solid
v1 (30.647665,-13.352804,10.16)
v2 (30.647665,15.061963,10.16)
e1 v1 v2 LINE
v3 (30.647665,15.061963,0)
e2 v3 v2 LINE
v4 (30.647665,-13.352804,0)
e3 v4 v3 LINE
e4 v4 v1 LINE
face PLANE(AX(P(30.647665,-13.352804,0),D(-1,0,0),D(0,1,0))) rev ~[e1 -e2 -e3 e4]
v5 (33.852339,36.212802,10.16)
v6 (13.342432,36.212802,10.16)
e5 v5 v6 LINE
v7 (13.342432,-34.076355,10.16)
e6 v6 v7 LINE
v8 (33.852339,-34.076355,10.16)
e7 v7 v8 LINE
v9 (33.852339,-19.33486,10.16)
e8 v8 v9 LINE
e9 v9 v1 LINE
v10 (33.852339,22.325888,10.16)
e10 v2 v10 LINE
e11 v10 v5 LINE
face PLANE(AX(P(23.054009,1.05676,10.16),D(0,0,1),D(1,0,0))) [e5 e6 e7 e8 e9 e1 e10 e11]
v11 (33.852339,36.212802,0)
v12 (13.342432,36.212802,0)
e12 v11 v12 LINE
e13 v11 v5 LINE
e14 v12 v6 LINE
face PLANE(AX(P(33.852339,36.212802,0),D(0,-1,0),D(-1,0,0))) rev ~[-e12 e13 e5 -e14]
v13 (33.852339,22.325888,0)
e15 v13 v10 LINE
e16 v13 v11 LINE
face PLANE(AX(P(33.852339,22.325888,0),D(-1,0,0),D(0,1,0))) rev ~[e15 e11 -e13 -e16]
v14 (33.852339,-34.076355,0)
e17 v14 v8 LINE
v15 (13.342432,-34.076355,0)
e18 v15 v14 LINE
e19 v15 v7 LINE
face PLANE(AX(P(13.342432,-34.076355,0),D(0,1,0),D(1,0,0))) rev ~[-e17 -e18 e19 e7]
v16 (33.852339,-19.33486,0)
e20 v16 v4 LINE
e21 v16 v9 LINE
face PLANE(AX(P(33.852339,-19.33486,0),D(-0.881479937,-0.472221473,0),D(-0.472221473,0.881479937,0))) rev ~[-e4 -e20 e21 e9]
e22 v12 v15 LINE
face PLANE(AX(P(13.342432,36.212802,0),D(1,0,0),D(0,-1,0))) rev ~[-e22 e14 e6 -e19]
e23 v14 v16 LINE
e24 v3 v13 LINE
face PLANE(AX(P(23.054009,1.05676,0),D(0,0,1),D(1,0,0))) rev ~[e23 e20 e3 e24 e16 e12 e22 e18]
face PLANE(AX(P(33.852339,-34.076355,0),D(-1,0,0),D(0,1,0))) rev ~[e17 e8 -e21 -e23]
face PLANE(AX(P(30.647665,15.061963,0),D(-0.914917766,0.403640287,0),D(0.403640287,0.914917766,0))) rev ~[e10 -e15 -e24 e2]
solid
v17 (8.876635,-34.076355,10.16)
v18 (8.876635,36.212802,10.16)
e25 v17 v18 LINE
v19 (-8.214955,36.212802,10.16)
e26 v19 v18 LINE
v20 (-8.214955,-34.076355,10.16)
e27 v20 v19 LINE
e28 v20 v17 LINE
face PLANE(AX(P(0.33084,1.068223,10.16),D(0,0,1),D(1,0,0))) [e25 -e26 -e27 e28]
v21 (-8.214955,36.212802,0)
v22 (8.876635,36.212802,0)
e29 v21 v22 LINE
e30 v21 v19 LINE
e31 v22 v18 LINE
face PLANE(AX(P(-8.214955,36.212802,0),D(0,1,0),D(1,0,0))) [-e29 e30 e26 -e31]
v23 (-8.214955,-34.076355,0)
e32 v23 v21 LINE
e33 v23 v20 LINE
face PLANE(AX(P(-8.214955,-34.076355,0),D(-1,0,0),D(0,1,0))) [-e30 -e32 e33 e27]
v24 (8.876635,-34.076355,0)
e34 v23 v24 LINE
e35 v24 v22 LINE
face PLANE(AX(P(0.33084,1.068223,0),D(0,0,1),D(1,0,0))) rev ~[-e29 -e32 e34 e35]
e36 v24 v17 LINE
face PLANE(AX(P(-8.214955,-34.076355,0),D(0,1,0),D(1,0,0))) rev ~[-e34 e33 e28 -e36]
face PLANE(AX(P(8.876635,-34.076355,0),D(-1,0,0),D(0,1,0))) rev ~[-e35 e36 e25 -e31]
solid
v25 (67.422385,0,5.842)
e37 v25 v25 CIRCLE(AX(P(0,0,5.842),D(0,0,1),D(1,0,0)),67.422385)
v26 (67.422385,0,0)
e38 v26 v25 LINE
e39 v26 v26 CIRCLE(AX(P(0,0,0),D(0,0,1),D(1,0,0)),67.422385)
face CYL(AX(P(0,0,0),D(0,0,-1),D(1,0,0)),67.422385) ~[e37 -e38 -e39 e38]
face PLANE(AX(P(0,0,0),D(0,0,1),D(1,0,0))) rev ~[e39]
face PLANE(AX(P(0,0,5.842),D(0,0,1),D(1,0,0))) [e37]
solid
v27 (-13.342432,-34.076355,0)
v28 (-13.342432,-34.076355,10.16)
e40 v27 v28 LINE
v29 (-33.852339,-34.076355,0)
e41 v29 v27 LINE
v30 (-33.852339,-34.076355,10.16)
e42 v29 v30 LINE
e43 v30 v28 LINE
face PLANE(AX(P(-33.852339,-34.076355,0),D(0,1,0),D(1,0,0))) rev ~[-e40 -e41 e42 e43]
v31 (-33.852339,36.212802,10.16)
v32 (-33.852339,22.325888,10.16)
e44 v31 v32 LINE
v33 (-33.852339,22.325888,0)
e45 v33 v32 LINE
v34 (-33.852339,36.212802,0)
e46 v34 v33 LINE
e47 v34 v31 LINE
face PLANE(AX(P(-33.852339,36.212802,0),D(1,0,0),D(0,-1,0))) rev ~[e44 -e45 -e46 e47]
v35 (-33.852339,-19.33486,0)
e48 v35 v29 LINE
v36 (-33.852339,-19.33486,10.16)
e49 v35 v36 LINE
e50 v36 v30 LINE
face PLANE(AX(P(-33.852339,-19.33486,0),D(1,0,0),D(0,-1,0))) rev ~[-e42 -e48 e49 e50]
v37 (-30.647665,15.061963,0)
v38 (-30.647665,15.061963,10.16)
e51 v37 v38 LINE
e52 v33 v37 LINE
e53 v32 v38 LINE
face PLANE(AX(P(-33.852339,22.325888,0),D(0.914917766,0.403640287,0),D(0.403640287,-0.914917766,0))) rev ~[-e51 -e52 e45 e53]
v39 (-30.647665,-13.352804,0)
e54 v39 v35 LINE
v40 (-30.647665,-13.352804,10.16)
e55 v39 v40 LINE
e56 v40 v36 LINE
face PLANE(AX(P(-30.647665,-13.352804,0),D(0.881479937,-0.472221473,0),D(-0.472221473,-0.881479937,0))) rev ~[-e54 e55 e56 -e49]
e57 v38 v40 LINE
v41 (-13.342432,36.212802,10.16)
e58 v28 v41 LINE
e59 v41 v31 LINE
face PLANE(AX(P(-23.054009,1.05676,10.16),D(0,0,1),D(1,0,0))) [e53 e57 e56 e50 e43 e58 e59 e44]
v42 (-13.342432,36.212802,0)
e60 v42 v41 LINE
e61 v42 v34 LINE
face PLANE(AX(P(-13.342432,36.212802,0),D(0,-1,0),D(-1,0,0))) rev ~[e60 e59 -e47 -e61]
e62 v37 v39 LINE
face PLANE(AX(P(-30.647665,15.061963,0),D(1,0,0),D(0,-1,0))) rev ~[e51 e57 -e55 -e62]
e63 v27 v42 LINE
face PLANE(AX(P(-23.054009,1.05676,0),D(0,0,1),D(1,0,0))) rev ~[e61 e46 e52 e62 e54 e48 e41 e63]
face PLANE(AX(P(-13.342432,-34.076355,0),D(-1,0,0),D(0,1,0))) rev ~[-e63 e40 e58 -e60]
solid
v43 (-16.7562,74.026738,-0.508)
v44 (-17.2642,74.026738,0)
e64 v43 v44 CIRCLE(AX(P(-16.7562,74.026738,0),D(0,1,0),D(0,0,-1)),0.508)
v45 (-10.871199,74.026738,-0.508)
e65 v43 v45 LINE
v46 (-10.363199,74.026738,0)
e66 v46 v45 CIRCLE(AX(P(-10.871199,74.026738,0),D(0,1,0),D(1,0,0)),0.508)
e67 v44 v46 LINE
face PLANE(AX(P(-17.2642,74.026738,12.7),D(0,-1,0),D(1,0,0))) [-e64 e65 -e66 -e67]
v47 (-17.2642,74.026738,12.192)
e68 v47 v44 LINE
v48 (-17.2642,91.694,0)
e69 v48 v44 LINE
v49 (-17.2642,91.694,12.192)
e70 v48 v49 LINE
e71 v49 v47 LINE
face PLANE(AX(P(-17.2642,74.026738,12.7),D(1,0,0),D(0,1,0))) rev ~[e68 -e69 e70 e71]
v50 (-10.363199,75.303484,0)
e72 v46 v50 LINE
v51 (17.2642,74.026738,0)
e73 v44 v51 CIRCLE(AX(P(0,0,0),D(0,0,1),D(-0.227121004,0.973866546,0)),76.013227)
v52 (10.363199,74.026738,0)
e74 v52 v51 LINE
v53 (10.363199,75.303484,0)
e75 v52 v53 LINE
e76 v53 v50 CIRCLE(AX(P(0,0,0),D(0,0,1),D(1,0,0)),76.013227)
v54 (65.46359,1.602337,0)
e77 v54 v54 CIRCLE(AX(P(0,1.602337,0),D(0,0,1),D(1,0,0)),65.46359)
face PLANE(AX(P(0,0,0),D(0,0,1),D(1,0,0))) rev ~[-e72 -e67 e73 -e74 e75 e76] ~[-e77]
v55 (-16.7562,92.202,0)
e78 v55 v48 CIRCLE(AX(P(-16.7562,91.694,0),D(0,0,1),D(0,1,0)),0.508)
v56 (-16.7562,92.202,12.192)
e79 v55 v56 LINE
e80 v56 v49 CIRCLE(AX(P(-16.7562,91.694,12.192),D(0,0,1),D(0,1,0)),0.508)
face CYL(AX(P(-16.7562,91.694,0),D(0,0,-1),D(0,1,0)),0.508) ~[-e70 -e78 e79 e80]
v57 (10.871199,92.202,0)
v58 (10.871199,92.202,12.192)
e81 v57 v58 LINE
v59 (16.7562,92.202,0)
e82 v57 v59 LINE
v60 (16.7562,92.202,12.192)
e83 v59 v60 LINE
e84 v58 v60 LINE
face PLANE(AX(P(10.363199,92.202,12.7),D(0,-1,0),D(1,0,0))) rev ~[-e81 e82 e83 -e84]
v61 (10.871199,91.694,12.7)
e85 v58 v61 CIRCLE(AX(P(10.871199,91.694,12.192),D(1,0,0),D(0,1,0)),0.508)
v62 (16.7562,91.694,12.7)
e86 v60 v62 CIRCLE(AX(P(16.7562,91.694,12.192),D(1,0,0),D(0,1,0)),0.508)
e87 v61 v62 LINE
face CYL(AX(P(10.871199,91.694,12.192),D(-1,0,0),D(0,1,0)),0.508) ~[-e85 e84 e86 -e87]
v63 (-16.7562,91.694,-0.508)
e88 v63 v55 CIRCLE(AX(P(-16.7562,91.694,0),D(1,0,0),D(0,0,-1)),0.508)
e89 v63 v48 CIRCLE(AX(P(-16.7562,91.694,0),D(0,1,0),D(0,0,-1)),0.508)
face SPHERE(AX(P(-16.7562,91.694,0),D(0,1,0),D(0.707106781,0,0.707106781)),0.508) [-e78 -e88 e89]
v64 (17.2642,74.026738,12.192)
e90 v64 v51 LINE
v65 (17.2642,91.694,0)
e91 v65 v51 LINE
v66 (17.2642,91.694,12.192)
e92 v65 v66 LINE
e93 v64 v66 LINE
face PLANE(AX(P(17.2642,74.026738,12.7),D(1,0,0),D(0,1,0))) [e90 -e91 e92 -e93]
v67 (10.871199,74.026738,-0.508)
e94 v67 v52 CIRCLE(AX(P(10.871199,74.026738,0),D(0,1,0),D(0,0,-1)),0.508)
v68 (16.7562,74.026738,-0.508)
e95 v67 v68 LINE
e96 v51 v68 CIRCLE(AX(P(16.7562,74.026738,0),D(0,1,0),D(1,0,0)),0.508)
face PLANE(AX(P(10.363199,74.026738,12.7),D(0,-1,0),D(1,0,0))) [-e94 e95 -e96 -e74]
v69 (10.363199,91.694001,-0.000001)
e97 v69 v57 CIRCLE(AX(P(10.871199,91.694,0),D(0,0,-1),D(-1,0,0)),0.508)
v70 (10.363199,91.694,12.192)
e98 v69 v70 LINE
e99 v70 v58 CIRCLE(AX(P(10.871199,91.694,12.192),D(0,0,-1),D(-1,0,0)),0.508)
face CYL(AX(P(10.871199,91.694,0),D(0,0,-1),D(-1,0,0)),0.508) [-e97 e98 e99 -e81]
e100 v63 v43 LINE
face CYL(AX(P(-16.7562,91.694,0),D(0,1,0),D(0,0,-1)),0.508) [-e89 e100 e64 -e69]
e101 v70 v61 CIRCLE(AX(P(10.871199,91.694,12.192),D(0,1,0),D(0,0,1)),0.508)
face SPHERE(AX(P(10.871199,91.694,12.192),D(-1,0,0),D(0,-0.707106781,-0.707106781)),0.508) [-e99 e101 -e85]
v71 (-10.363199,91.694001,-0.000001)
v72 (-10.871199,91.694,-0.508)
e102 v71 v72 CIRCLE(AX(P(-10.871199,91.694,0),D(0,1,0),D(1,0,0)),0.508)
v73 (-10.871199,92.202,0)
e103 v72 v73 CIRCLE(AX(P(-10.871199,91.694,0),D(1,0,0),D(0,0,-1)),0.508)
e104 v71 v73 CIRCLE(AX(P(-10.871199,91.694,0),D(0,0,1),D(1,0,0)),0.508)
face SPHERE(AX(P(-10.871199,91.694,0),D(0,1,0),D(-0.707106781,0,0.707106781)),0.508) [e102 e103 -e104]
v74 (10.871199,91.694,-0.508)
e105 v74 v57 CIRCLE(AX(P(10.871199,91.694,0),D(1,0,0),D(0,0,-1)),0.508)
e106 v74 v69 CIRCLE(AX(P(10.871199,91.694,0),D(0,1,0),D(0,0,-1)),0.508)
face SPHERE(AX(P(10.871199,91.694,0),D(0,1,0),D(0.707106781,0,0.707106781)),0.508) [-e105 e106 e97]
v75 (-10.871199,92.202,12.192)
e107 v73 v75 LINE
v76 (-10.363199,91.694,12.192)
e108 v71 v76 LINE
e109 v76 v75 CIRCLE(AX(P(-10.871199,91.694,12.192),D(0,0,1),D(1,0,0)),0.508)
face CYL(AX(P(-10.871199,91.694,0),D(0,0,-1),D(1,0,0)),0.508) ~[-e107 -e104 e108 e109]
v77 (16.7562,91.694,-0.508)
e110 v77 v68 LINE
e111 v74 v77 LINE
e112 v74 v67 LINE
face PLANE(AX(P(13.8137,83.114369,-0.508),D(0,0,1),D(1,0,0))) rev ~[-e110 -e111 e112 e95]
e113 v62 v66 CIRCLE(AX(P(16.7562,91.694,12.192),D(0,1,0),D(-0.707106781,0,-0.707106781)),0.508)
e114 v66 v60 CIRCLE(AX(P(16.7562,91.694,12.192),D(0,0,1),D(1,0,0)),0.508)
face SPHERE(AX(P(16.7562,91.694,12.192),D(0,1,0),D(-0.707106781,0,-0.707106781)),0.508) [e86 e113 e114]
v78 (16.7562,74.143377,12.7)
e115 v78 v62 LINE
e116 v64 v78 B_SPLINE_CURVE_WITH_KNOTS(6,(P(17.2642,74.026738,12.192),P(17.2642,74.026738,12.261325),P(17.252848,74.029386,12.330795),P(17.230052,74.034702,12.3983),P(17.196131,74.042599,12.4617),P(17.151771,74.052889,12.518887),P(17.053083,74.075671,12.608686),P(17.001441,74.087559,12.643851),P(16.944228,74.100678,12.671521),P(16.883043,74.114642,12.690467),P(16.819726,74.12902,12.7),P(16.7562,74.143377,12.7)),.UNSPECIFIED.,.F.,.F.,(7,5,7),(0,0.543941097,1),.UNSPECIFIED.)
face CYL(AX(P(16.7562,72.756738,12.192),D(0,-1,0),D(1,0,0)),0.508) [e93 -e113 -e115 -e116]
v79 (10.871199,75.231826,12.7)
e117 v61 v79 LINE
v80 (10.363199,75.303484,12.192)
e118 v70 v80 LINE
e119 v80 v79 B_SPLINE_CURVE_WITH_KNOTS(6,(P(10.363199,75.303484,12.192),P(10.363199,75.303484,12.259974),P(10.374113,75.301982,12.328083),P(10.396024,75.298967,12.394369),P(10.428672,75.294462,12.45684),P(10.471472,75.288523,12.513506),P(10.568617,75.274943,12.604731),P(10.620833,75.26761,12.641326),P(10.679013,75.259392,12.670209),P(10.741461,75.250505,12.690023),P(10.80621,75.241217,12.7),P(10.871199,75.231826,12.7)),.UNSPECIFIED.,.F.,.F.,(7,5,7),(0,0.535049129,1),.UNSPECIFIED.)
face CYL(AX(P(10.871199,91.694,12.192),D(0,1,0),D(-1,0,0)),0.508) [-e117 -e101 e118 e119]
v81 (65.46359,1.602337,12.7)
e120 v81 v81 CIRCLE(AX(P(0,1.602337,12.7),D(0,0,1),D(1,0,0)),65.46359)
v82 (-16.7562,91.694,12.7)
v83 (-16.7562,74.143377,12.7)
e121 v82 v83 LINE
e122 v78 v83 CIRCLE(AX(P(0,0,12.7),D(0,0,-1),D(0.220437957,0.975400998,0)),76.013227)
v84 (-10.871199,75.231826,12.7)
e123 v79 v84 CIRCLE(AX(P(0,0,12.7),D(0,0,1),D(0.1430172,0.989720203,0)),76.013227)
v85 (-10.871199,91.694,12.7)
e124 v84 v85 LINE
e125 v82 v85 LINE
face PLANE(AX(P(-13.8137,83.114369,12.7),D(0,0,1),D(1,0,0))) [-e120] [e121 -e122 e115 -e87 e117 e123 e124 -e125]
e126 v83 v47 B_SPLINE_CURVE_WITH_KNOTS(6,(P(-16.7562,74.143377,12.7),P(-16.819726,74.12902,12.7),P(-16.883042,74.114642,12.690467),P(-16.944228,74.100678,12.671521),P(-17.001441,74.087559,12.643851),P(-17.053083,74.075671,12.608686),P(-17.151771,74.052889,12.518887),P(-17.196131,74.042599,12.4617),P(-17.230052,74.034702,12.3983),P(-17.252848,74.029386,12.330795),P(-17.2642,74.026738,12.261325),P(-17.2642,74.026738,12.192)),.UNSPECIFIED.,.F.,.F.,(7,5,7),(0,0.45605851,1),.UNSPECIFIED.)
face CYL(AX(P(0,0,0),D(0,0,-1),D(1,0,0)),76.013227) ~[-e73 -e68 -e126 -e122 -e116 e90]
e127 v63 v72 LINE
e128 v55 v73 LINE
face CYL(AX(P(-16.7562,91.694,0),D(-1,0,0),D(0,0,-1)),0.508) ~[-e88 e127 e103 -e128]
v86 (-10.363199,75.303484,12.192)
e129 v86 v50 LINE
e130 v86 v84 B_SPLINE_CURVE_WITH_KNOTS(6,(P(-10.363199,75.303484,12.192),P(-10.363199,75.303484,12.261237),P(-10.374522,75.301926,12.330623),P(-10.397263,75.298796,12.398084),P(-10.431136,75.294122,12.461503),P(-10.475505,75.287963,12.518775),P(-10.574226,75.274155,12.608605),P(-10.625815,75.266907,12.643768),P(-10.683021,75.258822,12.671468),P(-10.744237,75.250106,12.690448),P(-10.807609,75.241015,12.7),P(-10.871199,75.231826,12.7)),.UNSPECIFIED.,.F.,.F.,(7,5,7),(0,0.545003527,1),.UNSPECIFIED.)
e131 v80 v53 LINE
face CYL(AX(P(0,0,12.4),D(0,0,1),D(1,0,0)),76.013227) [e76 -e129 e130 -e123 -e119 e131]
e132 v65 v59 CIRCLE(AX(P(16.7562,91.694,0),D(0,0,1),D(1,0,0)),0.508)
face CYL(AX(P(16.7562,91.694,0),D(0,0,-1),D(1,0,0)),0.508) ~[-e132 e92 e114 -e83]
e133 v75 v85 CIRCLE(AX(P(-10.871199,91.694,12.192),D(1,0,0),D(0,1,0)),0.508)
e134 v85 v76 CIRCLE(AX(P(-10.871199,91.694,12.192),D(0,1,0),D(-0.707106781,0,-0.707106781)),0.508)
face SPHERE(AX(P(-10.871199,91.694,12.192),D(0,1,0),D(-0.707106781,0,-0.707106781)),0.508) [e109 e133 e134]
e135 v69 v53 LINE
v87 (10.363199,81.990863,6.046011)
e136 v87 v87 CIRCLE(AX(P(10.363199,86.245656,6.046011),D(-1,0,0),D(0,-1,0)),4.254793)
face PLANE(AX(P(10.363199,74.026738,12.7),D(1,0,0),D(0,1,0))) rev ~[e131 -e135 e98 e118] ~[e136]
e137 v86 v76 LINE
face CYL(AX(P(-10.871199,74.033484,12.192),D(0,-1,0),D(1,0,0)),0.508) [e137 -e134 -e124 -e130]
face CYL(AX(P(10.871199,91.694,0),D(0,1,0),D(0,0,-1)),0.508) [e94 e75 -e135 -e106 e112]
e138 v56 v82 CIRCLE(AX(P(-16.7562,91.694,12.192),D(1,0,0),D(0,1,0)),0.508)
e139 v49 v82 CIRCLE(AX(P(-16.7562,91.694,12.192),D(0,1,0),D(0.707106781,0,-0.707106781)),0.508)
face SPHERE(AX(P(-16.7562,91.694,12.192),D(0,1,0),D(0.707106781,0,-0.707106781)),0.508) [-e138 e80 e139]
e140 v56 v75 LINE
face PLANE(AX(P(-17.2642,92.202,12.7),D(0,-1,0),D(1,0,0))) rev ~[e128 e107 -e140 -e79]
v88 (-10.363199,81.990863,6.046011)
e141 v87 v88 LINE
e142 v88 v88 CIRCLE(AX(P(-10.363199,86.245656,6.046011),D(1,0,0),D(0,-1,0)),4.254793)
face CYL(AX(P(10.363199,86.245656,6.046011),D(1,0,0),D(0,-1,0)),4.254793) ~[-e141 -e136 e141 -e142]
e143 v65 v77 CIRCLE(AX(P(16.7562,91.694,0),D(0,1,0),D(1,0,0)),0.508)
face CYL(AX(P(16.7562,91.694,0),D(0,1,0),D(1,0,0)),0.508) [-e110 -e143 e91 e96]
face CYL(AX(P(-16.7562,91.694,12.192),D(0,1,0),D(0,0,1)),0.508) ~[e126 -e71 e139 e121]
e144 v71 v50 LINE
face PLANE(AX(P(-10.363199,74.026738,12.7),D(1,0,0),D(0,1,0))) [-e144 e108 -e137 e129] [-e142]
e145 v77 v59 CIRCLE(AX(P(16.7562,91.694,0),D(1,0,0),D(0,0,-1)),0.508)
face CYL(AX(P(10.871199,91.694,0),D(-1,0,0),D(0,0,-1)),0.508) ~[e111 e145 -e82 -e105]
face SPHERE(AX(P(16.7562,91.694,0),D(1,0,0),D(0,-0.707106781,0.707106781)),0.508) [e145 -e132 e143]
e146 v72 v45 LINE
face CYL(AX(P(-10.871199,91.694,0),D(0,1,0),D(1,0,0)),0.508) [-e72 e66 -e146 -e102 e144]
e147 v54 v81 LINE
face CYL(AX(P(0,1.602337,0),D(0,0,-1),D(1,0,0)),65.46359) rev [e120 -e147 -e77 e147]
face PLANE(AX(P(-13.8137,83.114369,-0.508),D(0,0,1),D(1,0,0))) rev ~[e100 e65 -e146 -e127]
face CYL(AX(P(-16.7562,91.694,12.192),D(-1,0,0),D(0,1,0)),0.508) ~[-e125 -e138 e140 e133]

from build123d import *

# Parameters (mm, degrees)
F0_R         = 76.0132265617
F0_R_2       = 65.4635898971
F1_DEPTH     = 12.7
F2_DEPTH     = 10.16
F0_W         = 17.0915899798
F0_H         = 70.289157331
F3_R         = 67.422384844
F4_DEPTH     = 5.842
F5_W         = 6.9010015448
F5_H         = 18.1752619196
F6_DEPTH     = 13.208
F7_T1_DEPTH  = 5.8850015448
F7_T3_DEPTH  = 5.8850015448
F7_T5_DEPTH  = 12.192
F7_T7_DEPTH  = 18.9372619196
F7_S11_W     = 0.508
F7_S11_H     = 0.508
F7_T12_DEPTH = 0.508
F7_S17_W     = 0.508
F7_S17_H     = 0.508
F7_T18_DEPTH = 0.508
F7_S23_W     = 0.508
F7_S23_H     = 0.508
F7_T24_DEPTH = 0.508
F7_S29_W     = 0.508
F7_S29_H     = 0.508
F7_T30_DEPTH = 0.508
F7_S35_W     = 0.508
F7_S35_H     = 0.508
F7_T36_DEPTH = 0.508
F7_S41_W     = 0.508
F7_S41_H     = 0.508
F7_T42_DEPTH = 0.508
F7_S47_W     = 0.508
F7_S47_H     = 0.508
F7_T48_DEPTH = 0.508
F7_S53_W     = 0.508
F7_S53_H     = 0.508
F7_T54_DEPTH = 0.508
F7_T60_DEPTH = 17.6605161867
F7_S61_R     = 76.0132265617
F7_T62_DEPTH = 10
F7_T66_DEPTH = 18.9372619196
F7_S67_R     = 76.0132265617
F7_T68_DEPTH = 11
F7_T72_DEPTH = 17.6605161867
F7_S73_R     = 76.0132265617
F7_T74_DEPTH = 10
F7_T78_DEPTH = 18.9372619196
F7_S79_R     = 76.0132265617
F7_T80_DEPTH = 11
F8_R         = 4.2547927507
F9_DEPTH     = 25.4


# Not quite as in the source:
# - a fillet or chamfer that OpenCascade refuses, or shapes differently, is made with other operations: its cross-section is extruded or revolved along the edge and cut away or added


with BuildPart() as f1:
    # F0 (on Top) → F1 (new body)
    with BuildSketch(Plane.XY):
        Circle(F0_R)
        with Locations((0, 1.6023365315)):
            Circle(F0_R_2, mode=Mode.SUBTRACT)
    extrude(amount=F1_DEPTH)

    # F5 (on face) → F6 (join)
    with BuildSketch(Plane.XY.offset(12.7)):
        with Locations((-13.8136995892, 83.1143693602)):
            Rectangle(F5_W, F5_H)
        with Locations((13.8136995892, 83.1143693602)):
            Rectangle(F5_W, F5_H)
    extrude(amount=-F6_DEPTH)

    # F7: fillet of radius 0.508 on 16 edges, made by hand

    # F7_s2 → F7_t1 (cut)
    with BuildSketch(Plane.YZ.offset(-16.7562003616)):
        with BuildLine():
            ThreePointArc((92.20200032, 12.192), (92.0532105648, 12.5512102448), (91.69400032, 12.7))
            Line((91.69400032, 12.7), (92.20200032, 12.7))
            Line((92.20200032, 12.7), (92.20200032, 12.192))
        make_face()
        with BuildLine():
            ThreePointArc((91.69400032, -0.508), (92.0532105648, -0.3592102448), (92.20200032, 0))
            Line((92.20200032, 0), (92.20200032, -0.508))
            Line((92.20200032, -0.508), (91.69400032, -0.508))
        make_face()
    extrude(amount=F7_T1_DEPTH, mode=Mode.SUBTRACT)

    # F7_s4 → F7_t3 (cut)
    with BuildSketch(Plane.YZ.offset(10.8711988168)):
        with BuildLine():
            ThreePointArc((92.20200032, 12.192), (92.0532105648, 12.5512102448), (91.69400032, 12.7))
            Line((91.69400032, 12.7), (92.20200032, 12.7))
            Line((92.20200032, 12.7), (92.20200032, 12.192))
        make_face()
        with BuildLine():
            ThreePointArc((91.69400032, -0.508), (92.0532105648, -0.3592102448), (92.20200032, 0))
            Line((92.20200032, 0), (92.20200032, -0.508))
            Line((92.20200032, -0.508), (91.69400032, -0.508))
        make_face()
    extrude(amount=F7_T3_DEPTH, mode=Mode.SUBTRACT)

    # F7_s6 → F7_t5 (cut)
    with BuildSketch(Plane.XY):
        with BuildLine():
            ThreePointArc((17.2642003616, 91.69400032), (17.1154106065, 92.0532105648), (16.7562003616, 92.20200032))
            Line((16.7562003616, 92.20200032), (17.2642003616, 92.20200032))
            Line((17.2642003616, 92.20200032), (17.2642003616, 91.69400032))
        make_face()
        with BuildLine():
            ThreePointArc((10.3631988168, 91.69400032), (10.5119885719, 92.0532105648), (10.8711988168, 92.20200032))
            Line((10.8711988168, 92.20200032), (10.3631988168, 92.20200032))
            Line((10.3631988168, 92.20200032), (10.3631988168, 91.69400032))
        make_face()
        with BuildLine():
            ThreePointArc((-16.7562003616, 92.20200032), (-17.1154106065, 92.0532105648), (-17.2642003616, 91.69400032))
            Line((-17.2642003616, 91.69400032), (-17.2642003616, 92.20200032))
            Line((-17.2642003616, 92.20200032), (-16.7562003616, 92.20200032))
        make_face()
        with BuildLine():
            ThreePointArc((-10.3631988168, 91.69400032), (-10.5119885719, 92.0532105648), (-10.8711988168, 92.20200032))
            Line((-10.8711988168, 92.20200032), (-10.3631988168, 92.20200032))
            Line((-10.3631988168, 92.20200032), (-10.3631988168, 91.69400032))
        make_face()
    extrude(amount=F7_T5_DEPTH, mode=Mode.SUBTRACT)

    # F7_s8 → F7_t7 (cut)
    with BuildSketch(Plane.XZ.offset(-91.69400032)):
        with BuildLine():
            ThreePointArc((10.8711988168, -0.508), (10.5119885719, -0.3592102448), (10.3631988168, 0))
            Line((10.3631988168, 0), (10.3631988168, -0.508))
            Line((10.3631988168, -0.508), (10.8711988168, -0.508))
        make_face()
        with BuildLine():
            ThreePointArc((-16.7562003616, -0.508), (-17.1154106065, -0.3592102448), (-17.2642003616, 0))
            Line((-17.2642003616, 0), (-17.2642003616, -0.508))
            Line((-17.2642003616, -0.508), (-16.7562003616, -0.508))
        make_face()
        with BuildLine():
            ThreePointArc((17.2642003616, 0), (17.1154106065, -0.3592102448), (16.7562003616, -0.508))
            Line((16.7562003616, -0.508), (17.2642003616, -0.508))
            Line((17.2642003616, -0.508), (17.2642003616, 0))
        make_face()
        with BuildLine():
            ThreePointArc((-10.3631988168, 0), (-10.5119885719, -0.3592102448), (-10.8711988168, -0.508))
            Line((-10.8711988168, -0.508), (-10.3631988168, -0.508))
            Line((-10.3631988168, -0.508), (-10.3631988168, 0))
        make_face()
    extrude(amount=F7_T7_DEPTH, mode=Mode.SUBTRACT)


with BuildPart() as f2:
    # F0 (on Top) → F2 (new body)
    with BuildSketch(Plane.XY):
        Polygon((-13.3424317464, -34.0763553977), (-13.3424317464, 36.2128019333), (-33.8523387909, 36.2128019333), (-33.8523387909, 22.3258882761), (-30.6476652622, 15.0619633496), (-30.6476652622, -13.3528038859), (-33.8523387909, -19.334860146), (-33.8523387909, -34.0763553977), align=None)
    extrude(amount=F2_DEPTH)


with BuildPart() as f2b:
    # F0 (on Top) → F2, piece 2 (new body)
    with BuildSketch(Plane.XY):
        with Locations((0.3308397718, 1.0682232678)):
            Rectangle(F0_W, F0_H)
    extrude(amount=F2_DEPTH)


with BuildPart() as f2c:
    # F0 (on Top) → F2, piece 3 (new body)
    with BuildSketch(Plane.XY):
        Polygon((33.8523387909, 36.2128019333), (13.3424317464, 36.2128019333), (13.3424317464, -34.0763553977), (33.8523387909, -34.0763553977), (33.8523387909, -19.334860146), (30.6476652622, -13.3528038859), (30.6476652622, 15.0619633496), (33.8523387909, 22.3258882761), align=None)
    extrude(amount=F2_DEPTH)


with BuildPart() as f4:
    # F3 (on Top) → F4 (new body)
    with BuildSketch(Plane.XY):
        Circle(F3_R)
    extrude(amount=F4_DEPTH)


with BuildPart() as f7_tool10:
    # F7_s11 → F7_t12 (new body)
    with BuildSketch(Plane.XZ.offset(-91.69400032)):
        with Locations((-10.6171988168, 12.446)):
            Rectangle(F7_S11_W, F7_S11_H)
    extrude(amount=-F7_T12_DEPTH)

    # F7_s13 → F7_t14 (revolve, cut)
    with BuildSketch(Plane(origin=(-10.8711988168, 91.69400032, 12.192), x_dir=(-0.7071067812, 0, -0.7071067812), z_dir=(0.7071067812, 0, -0.7071067812))):
        with BuildLine():
            ThreePointArc((0, -0.508), (0.508, 0), (0, 0.508))
            Line((0, 0.508), (0, -0.508))
        make_face()
    revolve(axis=Axis((-10.8711988168, 91.69400032, 12.192), (0, 1, 0)), mode=Mode.SUBTRACT)


with BuildPart() as f1_1:
    add(f1.part)

    # F7_t9: cut F7_tool10
    add(f7_tool10.part, mode=Mode.SUBTRACT)


with BuildPart() as f7_tool16:
    # F7_s17 → F7_t18 (new body)
    with BuildSketch(Plane.XZ.offset(-91.69400032)):
        with Locations((-17.0102003616, 12.446)):
            Rectangle(F7_S17_W, F7_S17_H)
    extrude(amount=-F7_T18_DEPTH)

    # F7_s19 → F7_t20 (revolve, cut)
    with BuildSketch(Plane(origin=(-16.7562003616, 91.69400032, 12.192), x_dir=(0.7071067812, 0, -0.7071067812), z_dir=(0.7071067812, 0, 0.7071067812))):
        with BuildLine():
            ThreePointArc((0, -0.508), (0.508, 0), (0, 0.508))
            Line((0, 0.508), (0, -0.508))
        make_face()
    revolve(axis=Axis((-16.7562003616, 91.69400032, 12.192), (0, 1, 0)), mode=Mode.SUBTRACT)


with BuildPart() as f1_2:
    add(f1_1.part)

    # F7_t15: cut F7_tool16
    add(f7_tool16.part, mode=Mode.SUBTRACT)


with BuildPart() as f7_tool22:
    # F7_s23 → F7_t24 (new body)
    with BuildSketch(Plane.XZ.offset(-91.69400032)):
        with Locations((17.0102003616, 12.446)):
            Rectangle(F7_S23_W, F7_S23_H)
    extrude(amount=-F7_T24_DEPTH)

    # F7_s25 → F7_t26 (revolve, cut)
    with BuildSketch(Plane(origin=(16.7562003616, 91.69400032, 12.192), x_dir=(-0.7071067812, 0, -0.7071067812), z_dir=(0.7071067812, 0, -0.7071067812))):
        with BuildLine():
            ThreePointArc((0, -0.508), (0.508, 0), (0, 0.508))
            Line((0, 0.508), (0, -0.508))
        make_face()
    revolve(axis=Axis((16.7562003616, 91.69400032, 12.192), (0, 1, 0)), mode=Mode.SUBTRACT)


with BuildPart() as f1_3:
    add(f1_2.part)

    # F7_t21: cut F7_tool22
    add(f7_tool22.part, mode=Mode.SUBTRACT)


with BuildPart() as f7_tool28:
    # F7_s29 → F7_t30 (new body)
    with BuildSketch(Plane.YZ.offset(10.8711988168)):
        with Locations((91.94800032, 12.446)):
            Rectangle(F7_S29_W, F7_S29_H)
    extrude(amount=-F7_T30_DEPTH)

    # F7_s31 → F7_t32 (revolve, cut)
    with BuildSketch(Plane(origin=(10.8711988168, 91.69400032, 12.192), x_dir=(0, -0.7071067812, -0.7071067812), z_dir=(0, 0.7071067812, -0.7071067812))):
        with BuildLine():
            ThreePointArc((0, -0.508), (0.508, 0), (0, 0.508))
            Line((0, 0.508), (0, -0.508))
        make_face()
    revolve(axis=Axis((10.8711988168, 91.69400032, 12.192), (-1, 0, 0)), mode=Mode.SUBTRACT)


with BuildPart() as f1_4:
    add(f1_3.part)

    # F7_t27: cut F7_tool28
    add(f7_tool28.part, mode=Mode.SUBTRACT)


with BuildPart() as f7_tool34:
    # F7_s35 → F7_t36 (new body)
    with BuildSketch(Plane.YZ.offset(16.7562003616)):
        with Locations((91.94800032, -0.254)):
            Rectangle(F7_S35_W, F7_S35_H)
    extrude(amount=F7_T36_DEPTH)

    # F7_s37 → F7_t38 (revolve, cut)
    with BuildSketch(Plane(origin=(16.7562003616, 91.69400032, 0), x_dir=(0, -0.7071067812, 0.7071067812), z_dir=(0, 0.7071067812, 0.7071067812))):
        with BuildLine():
            ThreePointArc((0, -0.508), (0.508, 0), (0, 0.508))
            Line((0, 0.508), (0, -0.508))
        make_face()
    revolve(axis=Axis((16.7562003616, 91.69400032, 0), (1, 0, 0)), mode=Mode.SUBTRACT)


with BuildPart() as f1_5:
    add(f1_4.part)

    # F7_t33: cut F7_tool34
    add(f7_tool34.part, mode=Mode.SUBTRACT)


with BuildPart() as f7_tool40:
    # F7_s41 → F7_t42 (new body)
    with BuildSketch(Plane.XZ.offset(-91.69400032)):
        with Locations((10.6171988168, -0.254)):
            Rectangle(F7_S41_W, F7_S41_H)
    extrude(amount=-F7_T42_DEPTH)

    # F7_s43 → F7_t44 (revolve, cut)
    with BuildSketch(Plane(origin=(10.8711988168, 91.69400032, 0), x_dir=(0.7071067812, 0, 0.7071067812), z_dir=(-0.7071067812, 0, 0.7071067812))):
        with BuildLine():
            ThreePointArc((0, -0.508), (0.508, 0), (0, 0.508))
            Line((0, 0.508), (0, -0.508))
        make_face()
    revolve(axis=Axis((10.8711988168, 91.69400032, 0), (0, 1, 0)), mode=Mode.SUBTRACT)


with BuildPart() as f1_6:
    add(f1_5.part)

    # F7_t39: cut F7_tool40
    add(f7_tool40.part, mode=Mode.SUBTRACT)


with BuildPart() as f7_tool46:
    # F7_s47 → F7_t48 (new body)
    with BuildSketch(Plane.XZ.offset(-91.69400032)):
        with Locations((-17.0102003616, -0.254)):
            Rectangle(F7_S47_W, F7_S47_H)
    extrude(amount=-F7_T48_DEPTH)

    # F7_s49 → F7_t50 (revolve, cut)
    with BuildSketch(Plane(origin=(-16.7562003616, 91.69400032, 0), x_dir=(0.7071067812, 0, 0.7071067812), z_dir=(-0.7071067812, 0, 0.7071067812))):
        with BuildLine():
            ThreePointArc((0, -0.508), (0.508, 0), (0, 0.508))
            Line((0, 0.508), (0, -0.508))
        make_face()
    revolve(axis=Axis((-16.7562003616, 91.69400032, 0), (0, 1, 0)), mode=Mode.SUBTRACT)


with BuildPart() as f1_7:
    add(f1_6.part)

    # F7_t45: cut F7_tool46
    add(f7_tool46.part, mode=Mode.SUBTRACT)


with BuildPart() as f7_tool52:
    # F7_s53 → F7_t54 (new body)
    with BuildSketch(Plane.XZ.offset(-91.69400032)):
        with Locations((-10.6171988168, -0.254)):
            Rectangle(F7_S53_W, F7_S53_H)
    extrude(amount=-F7_T54_DEPTH)

    # F7_s55 → F7_t56 (revolve, cut)
    with BuildSketch(Plane(origin=(-10.8711988168, 91.69400032, 0), x_dir=(-0.7071067812, 0, 0.7071067812), z_dir=(-0.7071067812, 0, -0.7071067812))):
        with BuildLine():
            ThreePointArc((0, -0.508), (0.508, 0), (0, 0.508))
            Line((0, 0.508), (0, -0.508))
        make_face()
    revolve(axis=Axis((-10.8711988168, 91.69400032, 0), (0, 1, 0)), mode=Mode.SUBTRACT)


with BuildPart() as f1_8:
    add(f1_7.part)

    # F7_t51: cut F7_tool52
    add(f7_tool52.part, mode=Mode.SUBTRACT)


with BuildPart() as f7_tool58:
    # F7_s59 → F7_t60 (new body)
    with BuildSketch(Plane.XZ.offset(-91.69400032)):
        with BuildLine():
            ThreePointArc((10.3631988168, 12.192), (10.5119885719, 12.5512102448), (10.8711988168, 12.7))
            Line((10.8711988168, 12.7), (10.3631988168, 12.7))
            Line((10.3631988168, 12.7), (10.3631988168, 12.192))
        make_face()
    extrude(amount=F7_T60_DEPTH)

    # F7_s61 → F7_t62 (cut, symmetric)
    with BuildSketch(Plane.XY.offset(12.4)):
        Circle(F7_S61_R)
    extrude(amount=F7_T62_DEPTH, both=True, mode=Mode.SUBTRACT)


with BuildPart() as f1_9:
    add(f1_8.part)

    # F7_t57: cut F7_tool58
    add(f7_tool58.part, mode=Mode.SUBTRACT)


with BuildPart() as f7_tool64:
    # F7_s65 → F7_t66 (new body)
    with BuildSketch(Plane.XZ.offset(-72.7567384004)):
        with BuildLine():
            ThreePointArc((17.2642003616, 12.192), (17.1154106065, 12.5512102448), (16.7562003616, 12.7))
            Line((16.7562003616, 12.7), (17.2642003616, 12.7))
            Line((17.2642003616, 12.7), (17.2642003616, 12.192))
        make_face()
    extrude(amount=-F7_T66_DEPTH)

    # F7_s67 → F7_t68 (cut, symmetric)
    with BuildSketch(Plane.XY.offset(12.4)):
        Circle(F7_S67_R)
    extrude(amount=F7_T68_DEPTH, both=True, mode=Mode.SUBTRACT)


with BuildPart() as f1_10:
    add(f1_9.part)

    # F7_t63: cut F7_tool64
    add(f7_tool64.part, mode=Mode.SUBTRACT)


with BuildPart() as f7_tool70:
    # F7_s71 → F7_t72 (new body)
    with BuildSketch(Plane.XZ.offset(-74.0334841333)):
        with BuildLine():
            ThreePointArc((-10.3631988168, 12.192), (-10.5119885719, 12.5512102448), (-10.8711988168, 12.7))
            Line((-10.8711988168, 12.7), (-10.3631988168, 12.7))
            Line((-10.3631988168, 12.7), (-10.3631988168, 12.192))
        make_face()
    extrude(amount=-F7_T72_DEPTH)

    # F7_s73 → F7_t74 (cut, symmetric)
    with BuildSketch(Plane.XY.offset(12.4)):
        Circle(F7_S73_R)
    extrude(amount=F7_T74_DEPTH, both=True, mode=Mode.SUBTRACT)


with BuildPart() as f1_11:
    add(f1_10.part)

    # F7_t69: cut F7_tool70
    add(f7_tool70.part, mode=Mode.SUBTRACT)


with BuildPart() as f7_tool76:
    # F7_s77 → F7_t78 (new body)
    with BuildSketch(Plane.XZ.offset(-91.69400032)):
        with BuildLine():
            ThreePointArc((-16.7562003616, 12.7), (-17.1154106065, 12.5512102448), (-17.2642003616, 12.192))
            Line((-17.2642003616, 12.192), (-17.2642003616, 12.7))
            Line((-17.2642003616, 12.7), (-16.7562003616, 12.7))
        make_face()
    extrude(amount=F7_T78_DEPTH)

    # F7_s79 → F7_t80 (cut, symmetric)
    with BuildSketch(Plane.XY.offset(12.4)):
        Circle(F7_S79_R)
    extrude(amount=F7_T80_DEPTH, both=True, mode=Mode.SUBTRACT)


with BuildPart() as f1_12:
    add(f1_11.part)

    # F7_t75: cut F7_tool76
    add(f7_tool76.part, mode=Mode.SUBTRACT)

    # F8 (on face) → F9 (join)
    with BuildSketch(Plane(origin=(10.3631988168, 0, 0), x_dir=(0, -1, 0), z_dir=(-1, 0, 0))):
        with Locations((-86.2456560135, 6.0460111126)):
            Circle(F8_R)
    extrude(amount=F9_DEPTH)


solid = Compound([f2.part, f2b.part, f2c.part, f4.part, f1_12.part])
